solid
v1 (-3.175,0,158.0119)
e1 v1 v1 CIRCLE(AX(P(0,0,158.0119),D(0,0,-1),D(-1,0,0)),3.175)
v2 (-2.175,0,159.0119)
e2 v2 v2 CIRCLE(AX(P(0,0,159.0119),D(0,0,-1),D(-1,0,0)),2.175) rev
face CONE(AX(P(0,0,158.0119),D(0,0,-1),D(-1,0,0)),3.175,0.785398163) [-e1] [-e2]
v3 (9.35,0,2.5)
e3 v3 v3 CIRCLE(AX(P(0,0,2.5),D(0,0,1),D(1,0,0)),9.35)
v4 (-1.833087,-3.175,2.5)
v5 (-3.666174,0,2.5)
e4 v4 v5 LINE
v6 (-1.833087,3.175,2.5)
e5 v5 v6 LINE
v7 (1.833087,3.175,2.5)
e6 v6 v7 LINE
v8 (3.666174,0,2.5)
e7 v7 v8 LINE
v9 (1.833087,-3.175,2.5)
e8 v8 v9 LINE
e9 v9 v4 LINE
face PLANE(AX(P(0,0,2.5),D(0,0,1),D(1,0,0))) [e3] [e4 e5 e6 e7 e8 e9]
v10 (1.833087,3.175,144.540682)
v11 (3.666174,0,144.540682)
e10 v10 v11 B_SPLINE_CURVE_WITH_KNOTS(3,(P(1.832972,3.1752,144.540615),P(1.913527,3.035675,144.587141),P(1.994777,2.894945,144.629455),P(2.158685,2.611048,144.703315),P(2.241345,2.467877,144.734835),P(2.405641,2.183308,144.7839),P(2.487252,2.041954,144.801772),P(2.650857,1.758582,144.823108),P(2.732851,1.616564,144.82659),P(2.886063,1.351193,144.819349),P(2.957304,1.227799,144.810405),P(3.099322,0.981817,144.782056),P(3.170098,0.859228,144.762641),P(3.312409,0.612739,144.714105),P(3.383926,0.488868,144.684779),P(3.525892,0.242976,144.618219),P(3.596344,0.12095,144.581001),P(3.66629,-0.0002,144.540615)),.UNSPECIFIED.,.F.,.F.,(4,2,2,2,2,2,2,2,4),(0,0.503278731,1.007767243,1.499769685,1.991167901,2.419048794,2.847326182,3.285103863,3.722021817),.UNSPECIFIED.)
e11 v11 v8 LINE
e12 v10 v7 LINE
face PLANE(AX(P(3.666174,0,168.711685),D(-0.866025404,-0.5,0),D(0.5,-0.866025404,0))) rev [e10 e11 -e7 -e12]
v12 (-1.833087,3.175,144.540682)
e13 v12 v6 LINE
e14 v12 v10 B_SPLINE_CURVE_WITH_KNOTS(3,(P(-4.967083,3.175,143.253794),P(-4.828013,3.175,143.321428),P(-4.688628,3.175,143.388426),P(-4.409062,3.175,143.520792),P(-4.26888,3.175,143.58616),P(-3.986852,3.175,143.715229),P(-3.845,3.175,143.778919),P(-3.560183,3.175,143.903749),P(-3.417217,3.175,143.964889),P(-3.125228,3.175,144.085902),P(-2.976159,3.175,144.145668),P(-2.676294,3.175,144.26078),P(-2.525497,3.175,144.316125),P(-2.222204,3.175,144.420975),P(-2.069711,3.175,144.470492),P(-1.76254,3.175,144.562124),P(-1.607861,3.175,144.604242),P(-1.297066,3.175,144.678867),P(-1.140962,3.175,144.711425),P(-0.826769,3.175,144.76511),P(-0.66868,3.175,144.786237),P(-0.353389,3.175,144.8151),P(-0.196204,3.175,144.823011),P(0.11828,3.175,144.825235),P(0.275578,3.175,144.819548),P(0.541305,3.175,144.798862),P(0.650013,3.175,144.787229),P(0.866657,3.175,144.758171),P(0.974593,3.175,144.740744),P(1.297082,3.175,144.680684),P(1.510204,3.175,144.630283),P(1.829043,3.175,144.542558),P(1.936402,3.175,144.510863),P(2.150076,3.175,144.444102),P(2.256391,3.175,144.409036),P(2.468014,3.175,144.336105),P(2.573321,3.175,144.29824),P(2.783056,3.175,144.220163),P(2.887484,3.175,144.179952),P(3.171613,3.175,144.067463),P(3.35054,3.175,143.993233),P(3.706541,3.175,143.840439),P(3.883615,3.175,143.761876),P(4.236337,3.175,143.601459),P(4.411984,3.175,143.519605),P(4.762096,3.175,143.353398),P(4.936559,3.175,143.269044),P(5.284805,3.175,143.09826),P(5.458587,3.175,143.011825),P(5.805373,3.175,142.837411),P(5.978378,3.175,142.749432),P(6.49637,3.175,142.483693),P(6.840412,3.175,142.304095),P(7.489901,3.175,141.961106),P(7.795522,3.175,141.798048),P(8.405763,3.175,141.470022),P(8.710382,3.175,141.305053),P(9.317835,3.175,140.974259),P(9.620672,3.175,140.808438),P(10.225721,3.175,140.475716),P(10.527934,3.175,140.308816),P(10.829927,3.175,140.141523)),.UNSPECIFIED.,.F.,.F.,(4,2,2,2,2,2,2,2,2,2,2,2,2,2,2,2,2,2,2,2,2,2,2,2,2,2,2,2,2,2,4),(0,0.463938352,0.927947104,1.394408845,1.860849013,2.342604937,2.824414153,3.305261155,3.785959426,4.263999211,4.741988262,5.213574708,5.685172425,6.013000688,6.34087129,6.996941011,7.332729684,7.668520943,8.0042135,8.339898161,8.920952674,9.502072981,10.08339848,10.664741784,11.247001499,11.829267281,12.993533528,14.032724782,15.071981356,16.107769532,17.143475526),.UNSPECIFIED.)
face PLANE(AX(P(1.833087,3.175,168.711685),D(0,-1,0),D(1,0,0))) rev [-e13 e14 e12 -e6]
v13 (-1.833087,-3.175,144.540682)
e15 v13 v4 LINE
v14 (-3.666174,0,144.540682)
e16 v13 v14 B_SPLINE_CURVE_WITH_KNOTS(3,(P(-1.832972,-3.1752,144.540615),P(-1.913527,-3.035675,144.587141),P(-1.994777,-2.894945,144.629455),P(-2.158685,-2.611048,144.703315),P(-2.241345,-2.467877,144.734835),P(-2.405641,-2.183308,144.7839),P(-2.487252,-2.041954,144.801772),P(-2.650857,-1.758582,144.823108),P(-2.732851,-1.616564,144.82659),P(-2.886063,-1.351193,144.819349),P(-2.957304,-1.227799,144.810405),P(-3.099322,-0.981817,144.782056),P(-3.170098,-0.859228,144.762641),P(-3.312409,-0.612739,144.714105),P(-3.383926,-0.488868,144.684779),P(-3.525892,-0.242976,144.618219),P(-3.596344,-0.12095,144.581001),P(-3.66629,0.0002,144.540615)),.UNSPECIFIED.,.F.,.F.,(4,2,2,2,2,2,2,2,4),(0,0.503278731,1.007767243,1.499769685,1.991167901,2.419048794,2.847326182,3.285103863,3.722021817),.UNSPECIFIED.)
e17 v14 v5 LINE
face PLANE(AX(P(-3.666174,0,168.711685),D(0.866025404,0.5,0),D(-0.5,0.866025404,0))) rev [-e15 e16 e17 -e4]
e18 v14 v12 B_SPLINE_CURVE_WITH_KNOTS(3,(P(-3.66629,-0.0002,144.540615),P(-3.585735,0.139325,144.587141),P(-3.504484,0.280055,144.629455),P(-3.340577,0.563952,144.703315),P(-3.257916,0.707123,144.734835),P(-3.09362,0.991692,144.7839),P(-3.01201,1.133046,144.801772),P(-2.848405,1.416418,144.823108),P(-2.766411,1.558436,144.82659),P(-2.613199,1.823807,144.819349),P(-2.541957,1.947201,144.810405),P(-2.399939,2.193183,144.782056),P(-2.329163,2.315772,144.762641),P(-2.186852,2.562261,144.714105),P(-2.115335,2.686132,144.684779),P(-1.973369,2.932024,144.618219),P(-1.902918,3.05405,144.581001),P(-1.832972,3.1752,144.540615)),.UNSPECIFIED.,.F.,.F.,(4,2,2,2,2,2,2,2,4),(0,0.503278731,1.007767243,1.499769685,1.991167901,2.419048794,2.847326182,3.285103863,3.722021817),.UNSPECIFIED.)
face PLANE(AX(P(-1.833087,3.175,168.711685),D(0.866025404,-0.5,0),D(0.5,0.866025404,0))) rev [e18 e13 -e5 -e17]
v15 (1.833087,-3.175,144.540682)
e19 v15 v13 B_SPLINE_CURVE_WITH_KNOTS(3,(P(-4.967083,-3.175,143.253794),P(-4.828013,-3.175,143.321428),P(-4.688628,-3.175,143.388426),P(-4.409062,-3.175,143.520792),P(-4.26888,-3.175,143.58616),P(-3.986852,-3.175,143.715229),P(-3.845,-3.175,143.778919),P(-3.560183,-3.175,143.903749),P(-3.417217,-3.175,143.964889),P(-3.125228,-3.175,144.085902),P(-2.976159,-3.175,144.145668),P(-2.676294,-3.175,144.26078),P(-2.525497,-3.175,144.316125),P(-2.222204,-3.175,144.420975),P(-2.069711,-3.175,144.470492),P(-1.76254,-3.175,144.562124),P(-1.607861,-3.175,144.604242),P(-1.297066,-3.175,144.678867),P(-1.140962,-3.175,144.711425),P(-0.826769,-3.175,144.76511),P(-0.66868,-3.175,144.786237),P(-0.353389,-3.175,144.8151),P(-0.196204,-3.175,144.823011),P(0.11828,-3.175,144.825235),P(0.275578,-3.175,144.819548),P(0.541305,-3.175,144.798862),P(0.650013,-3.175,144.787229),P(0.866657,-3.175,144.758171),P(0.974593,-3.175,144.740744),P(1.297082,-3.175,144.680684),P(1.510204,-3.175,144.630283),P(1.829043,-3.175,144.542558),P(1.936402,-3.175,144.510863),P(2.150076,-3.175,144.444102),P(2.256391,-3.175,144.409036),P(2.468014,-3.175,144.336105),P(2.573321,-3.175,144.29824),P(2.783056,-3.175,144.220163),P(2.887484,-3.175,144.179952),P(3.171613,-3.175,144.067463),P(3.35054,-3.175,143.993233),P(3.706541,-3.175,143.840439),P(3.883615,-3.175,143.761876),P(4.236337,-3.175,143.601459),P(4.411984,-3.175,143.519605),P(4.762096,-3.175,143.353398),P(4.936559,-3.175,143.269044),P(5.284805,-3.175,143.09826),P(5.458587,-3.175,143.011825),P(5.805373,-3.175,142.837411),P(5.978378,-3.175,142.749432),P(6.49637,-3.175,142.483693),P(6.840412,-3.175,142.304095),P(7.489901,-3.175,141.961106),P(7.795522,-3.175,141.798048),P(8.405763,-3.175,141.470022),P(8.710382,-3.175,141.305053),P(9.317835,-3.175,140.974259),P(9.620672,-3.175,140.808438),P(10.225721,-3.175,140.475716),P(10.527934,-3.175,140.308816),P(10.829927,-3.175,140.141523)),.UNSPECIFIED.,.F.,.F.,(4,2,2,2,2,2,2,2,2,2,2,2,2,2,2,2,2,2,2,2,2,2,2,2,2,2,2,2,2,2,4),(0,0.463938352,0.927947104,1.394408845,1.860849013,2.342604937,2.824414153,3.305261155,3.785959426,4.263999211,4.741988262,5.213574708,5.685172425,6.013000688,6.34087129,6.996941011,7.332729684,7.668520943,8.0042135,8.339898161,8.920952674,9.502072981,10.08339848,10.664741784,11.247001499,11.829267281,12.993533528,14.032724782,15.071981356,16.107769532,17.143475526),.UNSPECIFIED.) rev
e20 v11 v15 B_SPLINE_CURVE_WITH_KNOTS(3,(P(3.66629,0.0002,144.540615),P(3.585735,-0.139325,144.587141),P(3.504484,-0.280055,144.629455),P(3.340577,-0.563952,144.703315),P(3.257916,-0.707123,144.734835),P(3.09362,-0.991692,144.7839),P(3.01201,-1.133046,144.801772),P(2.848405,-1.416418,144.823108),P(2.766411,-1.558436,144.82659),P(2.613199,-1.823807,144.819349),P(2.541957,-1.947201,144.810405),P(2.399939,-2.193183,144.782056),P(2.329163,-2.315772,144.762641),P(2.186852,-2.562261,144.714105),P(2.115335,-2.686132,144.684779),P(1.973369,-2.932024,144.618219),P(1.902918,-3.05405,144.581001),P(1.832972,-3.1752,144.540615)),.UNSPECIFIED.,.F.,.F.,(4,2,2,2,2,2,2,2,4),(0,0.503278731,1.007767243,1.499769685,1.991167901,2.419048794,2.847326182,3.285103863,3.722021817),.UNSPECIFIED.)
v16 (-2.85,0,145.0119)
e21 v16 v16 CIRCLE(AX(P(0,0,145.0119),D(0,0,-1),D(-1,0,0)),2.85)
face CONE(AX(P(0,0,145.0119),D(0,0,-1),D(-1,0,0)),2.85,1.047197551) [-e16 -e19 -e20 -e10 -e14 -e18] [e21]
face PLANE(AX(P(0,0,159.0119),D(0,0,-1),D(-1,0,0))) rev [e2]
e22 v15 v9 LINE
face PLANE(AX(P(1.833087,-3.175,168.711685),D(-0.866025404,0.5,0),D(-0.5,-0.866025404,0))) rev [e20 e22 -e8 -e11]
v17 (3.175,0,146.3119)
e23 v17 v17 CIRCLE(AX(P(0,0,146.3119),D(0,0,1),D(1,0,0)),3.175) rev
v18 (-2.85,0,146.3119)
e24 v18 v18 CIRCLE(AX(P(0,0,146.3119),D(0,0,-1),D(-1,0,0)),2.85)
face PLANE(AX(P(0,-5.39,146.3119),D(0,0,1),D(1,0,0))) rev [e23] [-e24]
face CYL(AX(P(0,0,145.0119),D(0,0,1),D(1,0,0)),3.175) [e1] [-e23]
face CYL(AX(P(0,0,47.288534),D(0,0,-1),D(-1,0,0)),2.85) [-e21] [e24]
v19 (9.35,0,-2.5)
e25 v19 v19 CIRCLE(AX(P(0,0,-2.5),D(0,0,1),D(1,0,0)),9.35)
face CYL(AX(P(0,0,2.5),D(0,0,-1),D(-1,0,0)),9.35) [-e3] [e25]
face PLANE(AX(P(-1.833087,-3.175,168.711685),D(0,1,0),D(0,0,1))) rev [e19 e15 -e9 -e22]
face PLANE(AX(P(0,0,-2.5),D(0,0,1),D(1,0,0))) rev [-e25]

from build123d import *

# Parameters (mm, degrees)
SKETCH1_R          = 9.35
PISTON_DEPTH       = 2.5
ROD_DEPTH          = 159.0119
SKETCH4_R          = 9.35
SKETCH4_R_2        = 3.175
THREAD_DEPTH       = 14
CHAMFER1_SIZE      = 1
SKETCH5_W          = 1.3
SKETCH5_H          = 2.54
CUT_REVOLVE1_ANGLE = 180


with BuildPart() as part:
    # Sketch1 → Piston (new, symmetric)
    with BuildSketch(Plane.XY):
        Circle(SKETCH1_R)
    extrude(amount=PISTON_DEPTH, both=True)

    # Sketch2 → Rod (add)
    with BuildSketch(Plane.XY):
        Polygon((3.666174209, 0), (1.833087105, 3.175), (-1.833087105, 3.175), (-3.666174209, 0), (-1.833087105, -3.175), (1.833087105, -3.175), align=None)
    extrude(amount=ROD_DEPTH)

    # Sketch4 → Thread (cut)
    with BuildSketch(Plane.XY.offset(159.0119)):
        Circle(SKETCH4_R)
        with Locations(Location((0, 0, 0), (0, 0, 330))):
            Circle(SKETCH4_R_2, mode=Mode.SUBTRACT)
    extrude(amount=-THREAD_DEPTH, mode=Mode.SUBTRACT)

    # Chamfer1
    chamfer1_edges = [part.edges().sort_by_distance(p)[0] for p in [
        (-2.749630657, 1.5875, 159.0119),
    ]]
    chamfer(chamfer1_edges, length=CHAMFER1_SIZE)

    # Sketch5 → Cut-Revolve1 (revolve, cut)
    with BuildSketch(Plane(origin=(0, 0, 0), x_dir=(0, 0, -1), z_dir=(1, 0, 0))):
        with Locations((-145.6619, 4.12)):
            Rectangle(SKETCH5_W, SKETCH5_H)
        with Locations((-145.6619, -4.12)):
            Rectangle(SKETCH5_W, SKETCH5_H)
    revolve(axis=Axis((0, 0, 47.288533753), (0, 0, 1)), revolution_arc=CUT_REVOLVE1_ANGLE, mode=Mode.SUBTRACT)

    # Sketch6 → Cut-Revolve2 (revolve, cut)
    with BuildSketch(Plane(origin=(0, 0, 0), x_dir=(0, 0, -1), z_dir=(1, 0, 0)), mode=Mode.PRIVATE) as cut_revolve2_sk:
        Polygon((-145.0119, 2.85), (-145.0119, 7.746831352), (-142.184713101, 7.746831352), align=None)
    revolve(cut_revolve2_sk.sketch.rotate(Axis((0, 0, 96.043182271), (0, 0, 1)), 90), axis=Axis((0, 0, 96.043182271), (0, 0, 1)), mode=Mode.SUBTRACT)


solid = part.part
